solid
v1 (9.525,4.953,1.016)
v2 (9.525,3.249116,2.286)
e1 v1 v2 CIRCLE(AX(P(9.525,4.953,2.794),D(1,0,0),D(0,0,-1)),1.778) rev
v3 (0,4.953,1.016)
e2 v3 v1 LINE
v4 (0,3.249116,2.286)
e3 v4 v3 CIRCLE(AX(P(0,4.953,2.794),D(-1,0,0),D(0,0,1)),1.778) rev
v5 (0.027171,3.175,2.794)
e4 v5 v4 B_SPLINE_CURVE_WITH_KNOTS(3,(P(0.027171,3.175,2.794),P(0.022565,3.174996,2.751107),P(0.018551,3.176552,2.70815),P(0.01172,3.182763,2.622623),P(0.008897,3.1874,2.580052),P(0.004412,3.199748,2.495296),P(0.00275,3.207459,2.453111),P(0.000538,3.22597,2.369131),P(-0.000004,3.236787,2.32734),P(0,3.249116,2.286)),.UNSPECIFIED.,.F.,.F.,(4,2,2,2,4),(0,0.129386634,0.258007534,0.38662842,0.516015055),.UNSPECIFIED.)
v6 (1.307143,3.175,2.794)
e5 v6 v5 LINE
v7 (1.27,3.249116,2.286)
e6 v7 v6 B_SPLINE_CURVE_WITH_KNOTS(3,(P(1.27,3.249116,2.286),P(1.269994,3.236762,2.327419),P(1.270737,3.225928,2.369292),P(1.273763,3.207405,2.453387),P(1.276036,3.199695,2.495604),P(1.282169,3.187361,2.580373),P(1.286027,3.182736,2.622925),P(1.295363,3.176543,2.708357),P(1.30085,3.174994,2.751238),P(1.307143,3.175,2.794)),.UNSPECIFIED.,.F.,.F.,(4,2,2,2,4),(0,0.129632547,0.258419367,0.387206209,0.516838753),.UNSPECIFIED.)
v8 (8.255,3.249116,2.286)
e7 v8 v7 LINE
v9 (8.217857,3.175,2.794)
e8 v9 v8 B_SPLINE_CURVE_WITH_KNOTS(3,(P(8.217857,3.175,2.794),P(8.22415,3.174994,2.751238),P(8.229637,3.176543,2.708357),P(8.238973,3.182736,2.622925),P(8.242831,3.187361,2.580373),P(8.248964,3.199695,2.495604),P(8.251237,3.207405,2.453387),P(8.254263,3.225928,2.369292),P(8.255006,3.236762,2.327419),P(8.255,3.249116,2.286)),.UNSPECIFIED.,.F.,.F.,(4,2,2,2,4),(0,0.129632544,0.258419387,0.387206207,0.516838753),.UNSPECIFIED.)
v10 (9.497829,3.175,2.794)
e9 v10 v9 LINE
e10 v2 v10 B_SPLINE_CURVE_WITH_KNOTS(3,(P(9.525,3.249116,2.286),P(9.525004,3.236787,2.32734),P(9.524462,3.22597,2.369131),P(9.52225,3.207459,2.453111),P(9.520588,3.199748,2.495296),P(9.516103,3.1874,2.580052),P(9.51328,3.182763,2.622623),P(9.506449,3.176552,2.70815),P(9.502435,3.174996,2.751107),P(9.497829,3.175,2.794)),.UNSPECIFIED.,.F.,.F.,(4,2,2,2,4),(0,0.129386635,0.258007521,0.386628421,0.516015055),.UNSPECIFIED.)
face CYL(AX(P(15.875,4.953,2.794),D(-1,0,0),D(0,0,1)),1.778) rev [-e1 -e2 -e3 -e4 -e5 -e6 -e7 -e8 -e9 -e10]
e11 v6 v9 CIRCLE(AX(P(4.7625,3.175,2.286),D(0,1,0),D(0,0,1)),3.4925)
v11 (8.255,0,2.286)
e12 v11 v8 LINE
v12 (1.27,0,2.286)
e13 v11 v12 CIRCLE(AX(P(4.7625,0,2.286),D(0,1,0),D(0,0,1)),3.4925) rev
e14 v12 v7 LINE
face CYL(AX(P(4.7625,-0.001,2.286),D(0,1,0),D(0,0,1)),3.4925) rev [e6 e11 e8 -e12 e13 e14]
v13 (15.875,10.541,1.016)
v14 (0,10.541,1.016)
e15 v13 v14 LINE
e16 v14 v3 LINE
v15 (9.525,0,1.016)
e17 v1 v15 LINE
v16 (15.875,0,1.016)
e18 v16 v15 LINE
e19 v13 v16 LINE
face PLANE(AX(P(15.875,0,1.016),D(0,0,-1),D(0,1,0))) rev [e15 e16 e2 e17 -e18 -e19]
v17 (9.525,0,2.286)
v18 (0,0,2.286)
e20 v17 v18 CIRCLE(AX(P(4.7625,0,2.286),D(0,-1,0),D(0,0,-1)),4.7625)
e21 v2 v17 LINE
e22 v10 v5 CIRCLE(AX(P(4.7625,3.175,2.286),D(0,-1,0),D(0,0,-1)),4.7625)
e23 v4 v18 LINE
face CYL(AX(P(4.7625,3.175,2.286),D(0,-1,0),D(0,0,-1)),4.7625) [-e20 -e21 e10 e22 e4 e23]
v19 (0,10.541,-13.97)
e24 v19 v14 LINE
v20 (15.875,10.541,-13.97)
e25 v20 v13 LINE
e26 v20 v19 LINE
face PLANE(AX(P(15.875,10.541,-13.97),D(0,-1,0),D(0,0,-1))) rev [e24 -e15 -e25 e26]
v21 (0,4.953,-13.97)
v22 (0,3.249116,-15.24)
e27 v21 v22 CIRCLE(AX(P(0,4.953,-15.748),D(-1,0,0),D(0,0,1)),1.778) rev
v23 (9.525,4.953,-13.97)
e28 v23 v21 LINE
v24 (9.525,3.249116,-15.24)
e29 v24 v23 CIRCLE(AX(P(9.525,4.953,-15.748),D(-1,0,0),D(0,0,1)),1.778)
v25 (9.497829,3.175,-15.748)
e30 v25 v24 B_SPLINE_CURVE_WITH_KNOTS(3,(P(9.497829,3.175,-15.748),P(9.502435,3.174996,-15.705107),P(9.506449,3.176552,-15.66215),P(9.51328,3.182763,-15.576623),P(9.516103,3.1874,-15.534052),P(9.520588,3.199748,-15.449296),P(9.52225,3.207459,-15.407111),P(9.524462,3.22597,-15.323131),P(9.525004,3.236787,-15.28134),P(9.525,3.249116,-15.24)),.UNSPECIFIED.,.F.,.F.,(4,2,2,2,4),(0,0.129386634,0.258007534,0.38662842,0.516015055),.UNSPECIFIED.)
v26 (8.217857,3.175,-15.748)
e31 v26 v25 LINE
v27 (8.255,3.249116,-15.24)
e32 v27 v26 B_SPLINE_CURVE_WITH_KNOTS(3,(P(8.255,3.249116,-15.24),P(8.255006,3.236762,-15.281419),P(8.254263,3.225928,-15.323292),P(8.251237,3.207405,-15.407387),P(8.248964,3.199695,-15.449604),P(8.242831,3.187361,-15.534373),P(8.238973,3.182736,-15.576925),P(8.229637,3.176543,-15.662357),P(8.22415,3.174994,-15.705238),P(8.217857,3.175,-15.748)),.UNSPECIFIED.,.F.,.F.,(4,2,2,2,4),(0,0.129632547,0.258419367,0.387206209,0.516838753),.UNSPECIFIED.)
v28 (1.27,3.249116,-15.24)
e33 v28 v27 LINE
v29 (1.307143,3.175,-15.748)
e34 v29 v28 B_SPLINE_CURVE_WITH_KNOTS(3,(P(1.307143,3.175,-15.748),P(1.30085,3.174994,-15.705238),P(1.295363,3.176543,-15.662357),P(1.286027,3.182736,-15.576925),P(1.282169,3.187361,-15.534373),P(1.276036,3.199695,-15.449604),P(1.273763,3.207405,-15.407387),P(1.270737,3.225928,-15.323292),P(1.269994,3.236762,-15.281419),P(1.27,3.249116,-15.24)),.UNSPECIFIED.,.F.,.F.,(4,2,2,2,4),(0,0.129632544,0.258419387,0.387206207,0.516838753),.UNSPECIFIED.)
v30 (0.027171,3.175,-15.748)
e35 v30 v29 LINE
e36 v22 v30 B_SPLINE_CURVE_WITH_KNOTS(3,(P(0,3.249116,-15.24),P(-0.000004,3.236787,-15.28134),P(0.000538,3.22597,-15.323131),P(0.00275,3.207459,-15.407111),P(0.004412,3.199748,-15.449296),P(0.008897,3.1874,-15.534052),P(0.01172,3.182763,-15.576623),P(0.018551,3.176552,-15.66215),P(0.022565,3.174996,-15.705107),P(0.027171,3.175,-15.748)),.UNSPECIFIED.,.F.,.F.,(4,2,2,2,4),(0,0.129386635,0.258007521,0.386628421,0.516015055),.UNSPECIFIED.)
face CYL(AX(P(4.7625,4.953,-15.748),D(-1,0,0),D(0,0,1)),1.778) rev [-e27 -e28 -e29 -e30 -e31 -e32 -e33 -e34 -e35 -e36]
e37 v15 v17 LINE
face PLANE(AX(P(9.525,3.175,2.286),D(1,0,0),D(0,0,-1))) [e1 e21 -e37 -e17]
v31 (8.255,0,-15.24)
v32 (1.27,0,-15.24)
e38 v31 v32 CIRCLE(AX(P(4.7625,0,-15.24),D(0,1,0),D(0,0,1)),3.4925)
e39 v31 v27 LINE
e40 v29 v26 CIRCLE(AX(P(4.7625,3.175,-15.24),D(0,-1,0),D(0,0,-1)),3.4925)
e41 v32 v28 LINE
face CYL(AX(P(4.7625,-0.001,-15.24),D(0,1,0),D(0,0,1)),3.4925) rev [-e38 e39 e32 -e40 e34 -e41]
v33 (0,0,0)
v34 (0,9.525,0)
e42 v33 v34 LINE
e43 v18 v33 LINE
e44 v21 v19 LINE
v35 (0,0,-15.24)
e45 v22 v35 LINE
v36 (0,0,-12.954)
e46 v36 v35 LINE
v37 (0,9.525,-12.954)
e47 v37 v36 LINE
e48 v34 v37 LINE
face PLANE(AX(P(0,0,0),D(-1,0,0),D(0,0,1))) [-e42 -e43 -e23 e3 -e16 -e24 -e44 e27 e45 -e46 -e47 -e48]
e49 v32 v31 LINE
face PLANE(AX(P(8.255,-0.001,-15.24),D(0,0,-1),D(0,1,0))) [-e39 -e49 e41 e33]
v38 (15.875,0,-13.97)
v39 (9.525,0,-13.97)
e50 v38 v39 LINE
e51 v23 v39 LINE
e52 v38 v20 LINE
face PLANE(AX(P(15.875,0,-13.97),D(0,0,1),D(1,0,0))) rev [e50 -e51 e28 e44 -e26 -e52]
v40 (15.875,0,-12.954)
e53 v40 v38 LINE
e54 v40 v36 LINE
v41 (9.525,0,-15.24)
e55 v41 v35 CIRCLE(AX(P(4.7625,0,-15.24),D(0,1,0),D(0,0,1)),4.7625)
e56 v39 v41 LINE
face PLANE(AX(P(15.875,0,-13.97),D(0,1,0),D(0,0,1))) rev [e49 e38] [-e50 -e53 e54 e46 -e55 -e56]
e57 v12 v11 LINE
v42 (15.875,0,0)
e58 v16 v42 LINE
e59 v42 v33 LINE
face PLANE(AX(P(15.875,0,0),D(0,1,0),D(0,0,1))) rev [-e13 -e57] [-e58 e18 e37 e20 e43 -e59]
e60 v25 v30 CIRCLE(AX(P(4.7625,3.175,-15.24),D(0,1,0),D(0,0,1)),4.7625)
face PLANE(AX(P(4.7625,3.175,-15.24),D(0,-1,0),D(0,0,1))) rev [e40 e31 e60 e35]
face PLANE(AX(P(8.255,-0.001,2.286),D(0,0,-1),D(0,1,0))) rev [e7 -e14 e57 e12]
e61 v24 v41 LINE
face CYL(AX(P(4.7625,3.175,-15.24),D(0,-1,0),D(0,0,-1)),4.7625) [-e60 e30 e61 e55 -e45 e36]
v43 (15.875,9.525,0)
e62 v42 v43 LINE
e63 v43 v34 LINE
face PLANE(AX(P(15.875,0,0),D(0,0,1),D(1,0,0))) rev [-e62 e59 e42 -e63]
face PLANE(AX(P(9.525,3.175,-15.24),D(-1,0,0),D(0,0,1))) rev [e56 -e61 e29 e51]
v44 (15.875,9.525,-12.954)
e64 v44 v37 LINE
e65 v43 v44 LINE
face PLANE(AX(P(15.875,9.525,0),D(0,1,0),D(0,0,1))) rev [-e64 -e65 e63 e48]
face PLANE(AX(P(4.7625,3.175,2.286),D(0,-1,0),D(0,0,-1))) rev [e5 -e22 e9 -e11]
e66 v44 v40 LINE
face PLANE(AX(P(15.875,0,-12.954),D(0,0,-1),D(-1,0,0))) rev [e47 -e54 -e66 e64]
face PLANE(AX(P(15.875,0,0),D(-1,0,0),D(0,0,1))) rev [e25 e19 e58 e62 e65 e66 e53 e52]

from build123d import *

# Parameters (mm, degrees)
BOSS_EXTRUDE1_DEPTH = 15.875
BOSS_EXTRUDE2_DEPTH = 3.175
CUT_EXTRUDE1_REACH  = 24.393
FILLET2_R           = 1.778
FILLET3_R           = 1.778


with BuildPart() as part:
    # Sketch1 → Boss-Extrude1 (new body)
    with BuildSketch(Plane(origin=(0, 0, 0), x_dir=(0, 0, -1), z_dir=(1, 0, 0))):
        Polygon((0, 0), (-1.016, 0), (-1.016, 10.541), (13.97, 10.541), (13.97, 0), (12.954, 0), (12.954, 9.525), (0, 9.525), align=None)
    extrude(amount=BOSS_EXTRUDE1_DEPTH)

    # Sketch2 → Boss-Extrude2 (add)
    with BuildSketch(Plane.XZ):
        with BuildLine():
            Line((9.525, 2.286), (9.525, 1.016))
            Line((9.525, 1.016), (0, 1.016))
            Line((0, 1.016), (0, 2.286))
            ThreePointArc((0, 2.286), (4.7625, 7.0485), (9.525, 2.286))
        make_face()
    boss_extrude2 = extrude(amount=-BOSS_EXTRUDE2_DEPTH)

    # Sketch4 → Cut-Extrude1 (cut, up to next)
    with BuildSketch(Plane(origin=(0, 3.175, 0), x_dir=(1, 0, 0), z_dir=(0, 1, 0)), mode=Mode.PRIVATE) as cut_extrude1_sk1:
        with BuildLine():
            Line((8.255, -2.286), (1.27, -2.286))
            ThreePointArc((1.27, -2.286), (4.7625, -5.7785), (8.255, -2.286))
        make_face()
    cut_extrude1_tool1 = extrude(cut_extrude1_sk1.sketch, amount=-CUT_EXTRUDE1_REACH, mode=Mode.PRIVATE) & part.part
    cut_extrude1 = cut_extrude1_tool1.solids().sort_by_distance((4.7625, 3.175, 3.768263))[0]
    add(cut_extrude1, mode=Mode.SUBTRACT)

    # Fillet2
    # the kernel refuses this fillet: 1.778 mm, written as the material it adds along each edge
    with BuildSketch(Plane(origin=(9.525, 3.175, 1.016), x_dir=(0, 1, 0), z_dir=(-1, 0, 0))) as fillet2_piece_1_section:
        with BuildLine():
            CenterArc((FILLET2_R, -FILLET2_R), FILLET2_R, 90, 90)
            Line((0, -FILLET2_R), (0, 0))
            Line((0, 0), (FILLET2_R, 0))
        make_face()
    fillet2_piece_1 = extrude(amount=9.525, mode=Mode.PRIVATE)
    fillet2_piece_1 = split(fillet2_piece_1, bisect_by=Plane(origin=(9.463917271, 3.688621556, 2.286), z_dir=(0, 0, -1)), keep=Keep.TOP, mode=Mode.PRIVATE)
    add(fillet2_piece_1)
    with BuildSketch(Plane(origin=(13.97, 3.175, 1.016), x_dir=(0, 1, 0), z_dir=(-1, 0, 0))) as fillet2_piece_2_section:
        with BuildLine():
            CenterArc((FILLET2_R, -FILLET2_R), FILLET2_R, 90, 90)
            Line((0, -FILLET2_R), (0, 0))
            Line((0, 0), (FILLET2_R, 0))
        make_face()
    fillet2_piece_2 = extrude(amount=18.415, mode=Mode.PRIVATE)
    fillet2_piece_2 = fillet2_piece_2 & Plane(origin=(4.7625, 3.197144068, 2.286), x_dir=(-1, 0, 0), z_dir=(0, -1, 0)) * Cylinder(4.7625, 44, mode=Mode.PRIVATE)
    fillet2_piece_2 = fillet2_piece_2 - Plane(origin=(4.7625, 3.197144068, 2.286), x_dir=(-1, 0, 0), z_dir=(0, 1, 0)) * Cylinder(3.4925, 44, mode=Mode.PRIVATE)
    add(fillet2_piece_2)

    # Mirror2: Boss-Extrude2 across plane
    add(boss_extrude2.mirror(Plane.XY.offset(-6.477)))

    # Mirror3: Cut-Extrude1 across plane
    add(cut_extrude1.mirror(Plane.XY.offset(-6.477)), mode=Mode.SUBTRACT)

    # Fillet3
    # the kernel refuses this fillet: 1.778 mm, written as the material it adds along each edge
    with BuildSketch(Plane(origin=(9.525, 3.175, -13.97), x_dir=(0, 0, -1), z_dir=(-1, 0, 0))) as fillet3_piece_1_section:
        with BuildLine():
            CenterArc((FILLET3_R, -FILLET3_R), FILLET3_R, 90, 90)
            Line((0, -FILLET3_R), (0, 0))
            Line((0, 0), (FILLET3_R, 0))
        make_face()
    fillet3_piece_1 = extrude(amount=9.525, mode=Mode.PRIVATE)
    fillet3_piece_1 = split(fillet3_piece_1, bisect_by=Plane(origin=(9.46391727, 3.688621585, -15.24), z_dir=(0, 0, 1)), keep=Keep.TOP, mode=Mode.PRIVATE)
    add(fillet3_piece_1)
    with BuildSketch(Plane(origin=(13.97, 3.175, -13.97), x_dir=(0, 0, -1), z_dir=(-1, 0, 0))) as fillet3_piece_2_section:
        with BuildLine():
            CenterArc((FILLET3_R, -FILLET3_R), FILLET3_R, 90, 90)
            Line((0, -FILLET3_R), (0, 0))
            Line((0, 0), (FILLET3_R, 0))
        make_face()
    fillet3_piece_2 = extrude(amount=18.415, mode=Mode.PRIVATE)
    fillet3_piece_2 = fillet3_piece_2 & Plane(origin=(4.7625, 3.197144068, -15.24), x_dir=(-1, 0, 0), z_dir=(0, -1, 0)) * Cylinder(4.7625, 44, mode=Mode.PRIVATE)
    fillet3_piece_2 = fillet3_piece_2 - Plane(origin=(4.7625, 3.197144068, -15.24), x_dir=(-1, 0, 0), z_dir=(0, 1, 0)) * Cylinder(3.4925, 44, mode=Mode.PRIVATE)
    add(fillet3_piece_2)


solid = part.part
